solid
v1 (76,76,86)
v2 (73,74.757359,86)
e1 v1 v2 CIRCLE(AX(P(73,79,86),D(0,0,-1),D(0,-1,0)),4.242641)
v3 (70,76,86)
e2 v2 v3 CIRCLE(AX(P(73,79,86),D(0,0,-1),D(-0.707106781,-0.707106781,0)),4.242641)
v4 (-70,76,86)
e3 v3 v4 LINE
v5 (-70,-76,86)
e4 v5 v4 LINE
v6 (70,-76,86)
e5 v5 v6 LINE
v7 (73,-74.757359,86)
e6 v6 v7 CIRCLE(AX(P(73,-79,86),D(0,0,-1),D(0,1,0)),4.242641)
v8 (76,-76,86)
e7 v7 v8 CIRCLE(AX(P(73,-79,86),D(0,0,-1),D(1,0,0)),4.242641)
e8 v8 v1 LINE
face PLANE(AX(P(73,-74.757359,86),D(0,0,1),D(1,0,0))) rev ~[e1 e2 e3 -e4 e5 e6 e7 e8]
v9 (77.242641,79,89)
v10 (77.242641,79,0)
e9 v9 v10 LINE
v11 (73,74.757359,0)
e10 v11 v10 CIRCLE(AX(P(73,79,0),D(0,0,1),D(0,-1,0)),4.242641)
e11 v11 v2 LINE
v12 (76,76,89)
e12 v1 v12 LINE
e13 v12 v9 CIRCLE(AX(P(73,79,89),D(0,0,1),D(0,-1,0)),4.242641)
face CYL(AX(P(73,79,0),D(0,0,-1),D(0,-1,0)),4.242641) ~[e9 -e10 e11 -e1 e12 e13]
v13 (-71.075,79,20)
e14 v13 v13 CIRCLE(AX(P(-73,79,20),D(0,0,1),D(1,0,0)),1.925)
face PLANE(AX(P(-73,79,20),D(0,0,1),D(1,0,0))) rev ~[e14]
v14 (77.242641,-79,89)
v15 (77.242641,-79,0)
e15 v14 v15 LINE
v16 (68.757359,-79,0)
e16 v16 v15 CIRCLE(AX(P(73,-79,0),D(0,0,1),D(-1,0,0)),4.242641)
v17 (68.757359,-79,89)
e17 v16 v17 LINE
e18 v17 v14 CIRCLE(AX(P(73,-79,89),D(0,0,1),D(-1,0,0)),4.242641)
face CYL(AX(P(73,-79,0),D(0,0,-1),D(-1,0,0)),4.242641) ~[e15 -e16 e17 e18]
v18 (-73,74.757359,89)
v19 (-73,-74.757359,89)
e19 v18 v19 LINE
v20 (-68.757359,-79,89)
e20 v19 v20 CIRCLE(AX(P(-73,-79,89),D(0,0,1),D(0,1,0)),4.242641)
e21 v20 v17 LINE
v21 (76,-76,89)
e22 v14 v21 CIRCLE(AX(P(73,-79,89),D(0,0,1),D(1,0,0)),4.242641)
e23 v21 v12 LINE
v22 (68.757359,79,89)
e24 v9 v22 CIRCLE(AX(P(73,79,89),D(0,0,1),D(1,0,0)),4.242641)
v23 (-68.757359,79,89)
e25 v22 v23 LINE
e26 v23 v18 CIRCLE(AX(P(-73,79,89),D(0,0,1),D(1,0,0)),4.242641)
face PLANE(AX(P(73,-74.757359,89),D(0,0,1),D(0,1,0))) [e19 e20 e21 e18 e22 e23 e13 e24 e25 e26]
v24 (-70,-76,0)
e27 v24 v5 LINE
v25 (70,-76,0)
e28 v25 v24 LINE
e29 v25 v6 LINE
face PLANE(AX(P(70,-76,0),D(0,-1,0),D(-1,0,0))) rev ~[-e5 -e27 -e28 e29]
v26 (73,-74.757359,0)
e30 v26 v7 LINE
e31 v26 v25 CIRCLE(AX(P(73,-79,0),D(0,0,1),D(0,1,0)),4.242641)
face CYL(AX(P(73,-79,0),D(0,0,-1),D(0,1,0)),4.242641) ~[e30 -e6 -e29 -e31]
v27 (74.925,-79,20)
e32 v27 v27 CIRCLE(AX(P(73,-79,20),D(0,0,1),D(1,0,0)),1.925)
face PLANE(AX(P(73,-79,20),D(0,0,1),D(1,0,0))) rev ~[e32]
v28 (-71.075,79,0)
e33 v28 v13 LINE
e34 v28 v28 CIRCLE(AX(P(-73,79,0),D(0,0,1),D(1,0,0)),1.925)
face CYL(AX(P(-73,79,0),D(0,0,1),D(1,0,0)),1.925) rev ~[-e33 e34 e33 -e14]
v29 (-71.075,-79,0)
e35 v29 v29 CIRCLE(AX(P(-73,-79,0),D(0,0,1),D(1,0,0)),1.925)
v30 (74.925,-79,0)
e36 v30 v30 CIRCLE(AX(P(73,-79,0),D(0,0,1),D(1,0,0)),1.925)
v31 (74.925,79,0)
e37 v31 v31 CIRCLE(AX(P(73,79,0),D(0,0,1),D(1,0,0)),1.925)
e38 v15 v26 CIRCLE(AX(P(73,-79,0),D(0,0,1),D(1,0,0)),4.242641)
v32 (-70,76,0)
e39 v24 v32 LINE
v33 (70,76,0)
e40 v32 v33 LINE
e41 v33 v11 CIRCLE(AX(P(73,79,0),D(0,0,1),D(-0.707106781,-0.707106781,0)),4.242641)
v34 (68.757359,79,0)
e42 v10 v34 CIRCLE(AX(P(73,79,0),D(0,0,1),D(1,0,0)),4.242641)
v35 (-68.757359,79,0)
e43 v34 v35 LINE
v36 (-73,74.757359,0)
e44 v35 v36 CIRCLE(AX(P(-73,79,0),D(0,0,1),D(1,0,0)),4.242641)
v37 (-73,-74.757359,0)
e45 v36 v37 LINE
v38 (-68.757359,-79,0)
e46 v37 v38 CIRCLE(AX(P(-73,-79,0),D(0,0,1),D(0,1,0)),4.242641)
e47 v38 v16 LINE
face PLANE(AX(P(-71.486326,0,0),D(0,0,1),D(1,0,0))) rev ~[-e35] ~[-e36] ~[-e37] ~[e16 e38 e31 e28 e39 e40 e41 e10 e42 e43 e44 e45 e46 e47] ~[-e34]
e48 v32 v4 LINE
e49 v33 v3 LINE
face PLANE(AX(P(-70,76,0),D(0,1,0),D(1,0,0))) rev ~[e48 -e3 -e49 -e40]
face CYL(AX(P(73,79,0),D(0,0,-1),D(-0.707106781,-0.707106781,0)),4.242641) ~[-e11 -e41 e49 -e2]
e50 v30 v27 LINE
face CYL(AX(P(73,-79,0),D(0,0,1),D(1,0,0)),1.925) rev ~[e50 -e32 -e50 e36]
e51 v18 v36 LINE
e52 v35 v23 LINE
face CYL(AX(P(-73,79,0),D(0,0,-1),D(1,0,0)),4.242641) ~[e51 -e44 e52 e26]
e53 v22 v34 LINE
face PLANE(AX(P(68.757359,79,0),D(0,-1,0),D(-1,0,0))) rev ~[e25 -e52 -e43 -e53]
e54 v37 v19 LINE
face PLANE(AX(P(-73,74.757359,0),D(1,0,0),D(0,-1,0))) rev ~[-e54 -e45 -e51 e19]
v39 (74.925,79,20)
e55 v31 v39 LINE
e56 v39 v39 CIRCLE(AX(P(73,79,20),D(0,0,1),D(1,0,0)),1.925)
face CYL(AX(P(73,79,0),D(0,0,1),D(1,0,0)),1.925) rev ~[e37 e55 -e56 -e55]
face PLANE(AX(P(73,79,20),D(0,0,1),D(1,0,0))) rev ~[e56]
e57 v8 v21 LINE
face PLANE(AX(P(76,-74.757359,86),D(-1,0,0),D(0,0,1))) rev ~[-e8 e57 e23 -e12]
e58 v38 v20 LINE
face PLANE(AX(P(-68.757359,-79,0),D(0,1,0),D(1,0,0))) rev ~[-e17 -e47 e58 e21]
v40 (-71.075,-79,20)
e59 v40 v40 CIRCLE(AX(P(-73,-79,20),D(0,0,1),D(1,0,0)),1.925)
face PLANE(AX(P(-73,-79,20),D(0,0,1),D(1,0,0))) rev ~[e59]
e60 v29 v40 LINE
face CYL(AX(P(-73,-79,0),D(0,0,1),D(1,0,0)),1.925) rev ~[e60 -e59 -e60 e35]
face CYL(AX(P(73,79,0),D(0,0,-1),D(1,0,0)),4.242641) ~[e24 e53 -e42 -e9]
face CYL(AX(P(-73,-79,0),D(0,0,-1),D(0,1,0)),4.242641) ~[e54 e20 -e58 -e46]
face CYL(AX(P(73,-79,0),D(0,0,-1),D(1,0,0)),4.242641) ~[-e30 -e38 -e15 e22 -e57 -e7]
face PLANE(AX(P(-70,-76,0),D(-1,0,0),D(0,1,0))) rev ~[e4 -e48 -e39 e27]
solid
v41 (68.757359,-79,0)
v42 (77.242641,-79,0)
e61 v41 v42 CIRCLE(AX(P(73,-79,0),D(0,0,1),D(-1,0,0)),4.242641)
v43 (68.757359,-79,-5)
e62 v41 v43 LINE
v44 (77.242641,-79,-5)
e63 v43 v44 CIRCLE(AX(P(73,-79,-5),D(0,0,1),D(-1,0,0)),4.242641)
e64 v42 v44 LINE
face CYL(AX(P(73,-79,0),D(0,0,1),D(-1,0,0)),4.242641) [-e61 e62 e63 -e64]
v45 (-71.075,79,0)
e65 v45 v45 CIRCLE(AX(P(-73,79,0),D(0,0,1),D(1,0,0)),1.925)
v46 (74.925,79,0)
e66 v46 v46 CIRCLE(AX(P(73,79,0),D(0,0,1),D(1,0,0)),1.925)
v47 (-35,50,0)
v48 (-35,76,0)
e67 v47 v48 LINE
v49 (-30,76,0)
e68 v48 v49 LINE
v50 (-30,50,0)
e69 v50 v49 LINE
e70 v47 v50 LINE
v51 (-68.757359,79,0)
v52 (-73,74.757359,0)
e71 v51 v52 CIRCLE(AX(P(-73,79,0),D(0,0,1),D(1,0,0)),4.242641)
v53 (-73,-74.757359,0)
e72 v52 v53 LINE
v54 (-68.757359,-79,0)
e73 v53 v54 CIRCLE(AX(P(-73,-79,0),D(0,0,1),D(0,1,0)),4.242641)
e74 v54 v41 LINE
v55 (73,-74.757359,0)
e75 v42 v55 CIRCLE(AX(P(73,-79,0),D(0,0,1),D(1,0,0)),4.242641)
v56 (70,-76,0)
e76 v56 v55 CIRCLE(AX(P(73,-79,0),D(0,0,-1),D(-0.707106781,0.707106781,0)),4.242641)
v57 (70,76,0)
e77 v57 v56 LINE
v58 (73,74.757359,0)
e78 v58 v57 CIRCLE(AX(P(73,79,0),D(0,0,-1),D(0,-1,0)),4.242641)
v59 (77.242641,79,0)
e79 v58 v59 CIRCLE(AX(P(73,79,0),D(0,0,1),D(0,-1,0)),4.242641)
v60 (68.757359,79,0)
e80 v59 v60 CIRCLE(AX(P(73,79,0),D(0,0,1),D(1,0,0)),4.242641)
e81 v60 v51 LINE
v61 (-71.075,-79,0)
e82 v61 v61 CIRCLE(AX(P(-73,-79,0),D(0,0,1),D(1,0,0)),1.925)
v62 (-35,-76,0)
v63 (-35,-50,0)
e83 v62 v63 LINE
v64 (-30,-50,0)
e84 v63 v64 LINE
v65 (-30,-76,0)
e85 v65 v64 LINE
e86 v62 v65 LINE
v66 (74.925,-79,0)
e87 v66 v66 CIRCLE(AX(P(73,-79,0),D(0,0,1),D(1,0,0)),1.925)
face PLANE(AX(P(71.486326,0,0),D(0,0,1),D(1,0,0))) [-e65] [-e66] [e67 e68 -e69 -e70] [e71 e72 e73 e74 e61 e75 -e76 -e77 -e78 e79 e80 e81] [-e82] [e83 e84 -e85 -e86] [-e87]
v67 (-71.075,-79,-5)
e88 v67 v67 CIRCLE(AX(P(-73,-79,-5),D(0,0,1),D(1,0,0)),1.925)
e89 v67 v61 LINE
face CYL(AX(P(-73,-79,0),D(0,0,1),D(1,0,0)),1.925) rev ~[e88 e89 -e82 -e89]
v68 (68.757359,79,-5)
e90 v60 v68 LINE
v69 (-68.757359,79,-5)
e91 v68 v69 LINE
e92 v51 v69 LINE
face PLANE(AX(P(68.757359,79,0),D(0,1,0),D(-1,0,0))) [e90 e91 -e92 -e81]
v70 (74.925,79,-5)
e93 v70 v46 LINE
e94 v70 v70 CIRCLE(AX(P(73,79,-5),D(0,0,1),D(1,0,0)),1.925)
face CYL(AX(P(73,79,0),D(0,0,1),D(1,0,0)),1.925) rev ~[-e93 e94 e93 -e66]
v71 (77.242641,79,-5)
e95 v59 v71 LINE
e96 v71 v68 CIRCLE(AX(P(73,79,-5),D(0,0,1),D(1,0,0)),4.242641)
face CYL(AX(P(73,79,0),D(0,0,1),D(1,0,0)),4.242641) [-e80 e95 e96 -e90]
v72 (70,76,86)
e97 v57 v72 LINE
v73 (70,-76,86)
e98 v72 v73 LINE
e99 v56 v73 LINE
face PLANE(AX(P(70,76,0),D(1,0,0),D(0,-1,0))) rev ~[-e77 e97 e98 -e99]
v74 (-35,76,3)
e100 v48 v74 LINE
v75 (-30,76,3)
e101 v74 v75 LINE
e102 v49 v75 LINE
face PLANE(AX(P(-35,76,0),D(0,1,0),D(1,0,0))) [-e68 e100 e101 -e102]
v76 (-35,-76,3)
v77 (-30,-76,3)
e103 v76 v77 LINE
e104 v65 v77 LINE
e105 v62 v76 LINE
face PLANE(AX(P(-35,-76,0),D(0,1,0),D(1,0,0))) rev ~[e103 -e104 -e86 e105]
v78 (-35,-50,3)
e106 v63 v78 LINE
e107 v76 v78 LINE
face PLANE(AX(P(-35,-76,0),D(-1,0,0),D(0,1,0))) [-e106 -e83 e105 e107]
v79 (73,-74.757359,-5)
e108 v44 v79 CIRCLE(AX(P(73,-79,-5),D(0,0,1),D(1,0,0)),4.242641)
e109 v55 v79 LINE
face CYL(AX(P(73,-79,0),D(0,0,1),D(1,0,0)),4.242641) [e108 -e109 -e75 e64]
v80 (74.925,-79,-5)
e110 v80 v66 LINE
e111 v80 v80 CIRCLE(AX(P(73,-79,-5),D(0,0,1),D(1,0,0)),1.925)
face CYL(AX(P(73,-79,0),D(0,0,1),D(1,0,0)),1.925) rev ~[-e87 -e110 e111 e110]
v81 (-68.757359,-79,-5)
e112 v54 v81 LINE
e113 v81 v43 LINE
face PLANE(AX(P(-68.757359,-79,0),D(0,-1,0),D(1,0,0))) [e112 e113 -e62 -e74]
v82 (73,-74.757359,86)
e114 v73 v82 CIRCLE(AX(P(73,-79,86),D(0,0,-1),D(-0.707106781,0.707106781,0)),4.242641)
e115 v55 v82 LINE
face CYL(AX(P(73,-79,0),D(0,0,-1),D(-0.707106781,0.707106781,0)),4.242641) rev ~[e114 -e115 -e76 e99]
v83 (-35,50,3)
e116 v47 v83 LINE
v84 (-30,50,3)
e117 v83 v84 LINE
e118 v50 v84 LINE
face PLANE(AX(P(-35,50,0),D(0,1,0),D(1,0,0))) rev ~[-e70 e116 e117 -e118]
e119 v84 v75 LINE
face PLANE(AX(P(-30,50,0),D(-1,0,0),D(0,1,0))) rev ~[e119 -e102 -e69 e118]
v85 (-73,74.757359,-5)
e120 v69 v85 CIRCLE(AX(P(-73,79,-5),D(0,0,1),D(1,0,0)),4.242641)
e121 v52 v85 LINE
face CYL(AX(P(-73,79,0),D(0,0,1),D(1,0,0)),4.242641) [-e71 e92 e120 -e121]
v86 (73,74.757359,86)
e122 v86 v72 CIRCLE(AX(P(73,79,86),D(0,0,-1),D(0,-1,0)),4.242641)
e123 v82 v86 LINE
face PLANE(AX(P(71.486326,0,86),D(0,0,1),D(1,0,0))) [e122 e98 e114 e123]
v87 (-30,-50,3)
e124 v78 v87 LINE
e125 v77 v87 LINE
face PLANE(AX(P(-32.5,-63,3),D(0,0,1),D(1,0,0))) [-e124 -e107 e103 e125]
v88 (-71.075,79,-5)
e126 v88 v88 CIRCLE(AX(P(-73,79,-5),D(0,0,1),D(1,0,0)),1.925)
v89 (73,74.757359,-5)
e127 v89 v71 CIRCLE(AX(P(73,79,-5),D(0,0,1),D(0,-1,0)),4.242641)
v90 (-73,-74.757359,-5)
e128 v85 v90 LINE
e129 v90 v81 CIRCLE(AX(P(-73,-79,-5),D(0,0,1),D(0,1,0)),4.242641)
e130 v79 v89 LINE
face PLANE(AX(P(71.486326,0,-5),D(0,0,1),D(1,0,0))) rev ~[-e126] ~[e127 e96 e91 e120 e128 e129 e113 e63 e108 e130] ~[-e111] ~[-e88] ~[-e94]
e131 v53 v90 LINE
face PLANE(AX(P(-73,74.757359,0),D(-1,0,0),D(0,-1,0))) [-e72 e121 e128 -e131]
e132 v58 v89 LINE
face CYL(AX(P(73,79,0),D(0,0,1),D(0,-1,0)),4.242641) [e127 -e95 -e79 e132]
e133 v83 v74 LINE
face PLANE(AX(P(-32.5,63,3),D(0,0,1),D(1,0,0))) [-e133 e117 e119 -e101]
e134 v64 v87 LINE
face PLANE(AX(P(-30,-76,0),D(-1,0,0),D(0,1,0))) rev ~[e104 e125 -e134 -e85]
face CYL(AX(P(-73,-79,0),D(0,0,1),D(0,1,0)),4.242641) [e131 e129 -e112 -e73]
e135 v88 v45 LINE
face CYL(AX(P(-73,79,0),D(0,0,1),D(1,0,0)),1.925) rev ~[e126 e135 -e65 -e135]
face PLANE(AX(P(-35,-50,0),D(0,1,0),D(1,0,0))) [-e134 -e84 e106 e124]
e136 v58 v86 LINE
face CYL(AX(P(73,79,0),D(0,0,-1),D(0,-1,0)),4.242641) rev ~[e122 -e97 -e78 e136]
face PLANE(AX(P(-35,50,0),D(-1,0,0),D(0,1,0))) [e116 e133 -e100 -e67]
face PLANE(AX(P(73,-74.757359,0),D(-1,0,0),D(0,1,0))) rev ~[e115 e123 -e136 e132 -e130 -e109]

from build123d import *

# Parameters (mm, degrees)
F0_W          = 5
F0_H          = 26
F1_DEPTH      = 5
F2_DEPTH      = 86
F3_DEPTH      = 3
F4_DEPTH      = 89
F5_START      = 86
F5_DEPTH      = 3
F6_R          = 1.925
F7_DEPTH      = 20
F7_DEPTH_BACK = 5
F8_DEPTH      = 3
F9_DEPTH      = 1.2426406871
F10_DEPTH     = 1.2426406871


# Not quite as in the source:
# - a feature names something its author has since deleted; it is built from what else it names


with BuildPart() as f1:
    # F0 (on Top) → F1 (new body)
    with BuildSketch(Plane.XY):
        with BuildLine():
            ThreePointArc((73, 74.7573593129), (71.3764116996, 75.0803111054), (70, 76))
            Line((70, 76), (70, -76))
            ThreePointArc((70, -76), (71.3764116996, -75.0803111054), (73, -74.7573593129))
            Line((73, -74.7573593129), (73, 74.7573593129))
        make_face()
        Polygon((70, -76), (70, 76), (-30, 76), (-30, 50), (-30, -50), (-30, -76), align=None)
        Polygon((-35, 50), (-35, 76), (-70, 76), (-70, -76), (-35, -76), (-35, -50), (-30, -50), (-30, 50), align=None)
        with Locations((-32.5, -63)):
            Rectangle(F0_W, F0_H)
        with Locations((-32.5, 63)):
            Rectangle(F0_W, F0_H)
        with BuildLine():
            Line((-70, -76), (-70, 76))
            ThreePointArc((-70, 76), (-71.3764116996, 75.0803111054), (-73, 74.7573593129))
            Line((-73, 74.7573593129), (-73, -74.7573593129))
            ThreePointArc((-73, -74.7573593129), (-71.3764116996, -75.0803111054), (-70, -76))
        make_face()
        with BuildLine():
            ThreePointArc((73, -74.7573593129), (71.3764116996, -75.0803111054), (70, -76))
            Line((70, -76), (73, -76))
            Line((73, -76), (73, -74.7573593129))
        make_face()
        with BuildLine():
            Line((73, -76), (70, -76))
            ThreePointArc((70, -76), (69.0803111054, -77.3764116996), (68.7573593129, -79))
            Line((68.7573593129, -79), (73, -79))
            Line((73, -79), (73, -76))
        make_face()
        with BuildLine():
            Line((73, -74.7573593129), (73, -76))
            Line((73, -76), (73, -79))
            Line((73, -79), (68.7573593129, -79))
            ThreePointArc((68.7573593129, -79), (73, -83.2426406871), (77.2426406871, -79))
            ThreePointArc((77.2426406871, -79), (76, -76), (73, -74.7573593129))
        make_face()
        with BuildLine():
            Line((73, 76), (70, 76))
            ThreePointArc((70, 76), (71.3764116996, 75.0803111054), (73, 74.7573593129))
            Line((73, 74.7573593129), (73, 76))
        make_face()
        with BuildLine():
            ThreePointArc((68.7573593129, 79), (69.0803111054, 77.3764116996), (70, 76))
            Line((70, 76), (73, 76))
            Line((73, 76), (73, 79))
            Line((73, 79), (68.7573593129, 79))
        make_face()
        with BuildLine():
            Line((73, 79), (73, 76))
            Line((73, 76), (73, 74.7573593129))
            ThreePointArc((73, 74.7573593129), (76, 76), (77.2426406871, 79))
            ThreePointArc((77.2426406871, 79), (73, 83.2426406871), (68.7573593129, 79))
            Line((68.7573593129, 79), (73, 79))
        make_face()
        with BuildLine():
            Line((-30, 76), (70, 76))
            ThreePointArc((70, 76), (69.0803111054, 77.3764116996), (68.7573593129, 79))
            Line((68.7573593129, 79), (-68.7573593129, 79))
            ThreePointArc((-68.7573593129, 79), (-69.0803111054, 77.3764116996), (-70, 76))
            Line((-70, 76), (-35, 76))
            Line((-35, 76), (-30, 76))
        make_face()
        with BuildLine():
            ThreePointArc((-70, 76), (-69.0803111054, 77.3764116996), (-68.7573593129, 79))
            Line((-68.7573593129, 79), (-73, 79))
            Line((-73, 79), (-73, 74.7573593129))
            ThreePointArc((-73, 74.7573593129), (-71.3764116996, 75.0803111054), (-70, 76))
        make_face()
        with BuildLine():
            Line((-73, 79), (-68.7573593129, 79))
            ThreePointArc((-68.7573593129, 79), (-76, 82), (-73, 74.7573593129))
            Line((-73, 74.7573593129), (-73, 79))
        make_face()
        with BuildLine():
            Line((-73, -79), (-68.7573593129, -79))
            ThreePointArc((-68.7573593129, -79), (-69.0803111054, -77.3764116996), (-70, -76))
            ThreePointArc((-70, -76), (-71.3764116996, -75.0803111054), (-73, -74.7573593129))
            Line((-73, -74.7573593129), (-73, -79))
        make_face()
        with BuildLine():
            ThreePointArc((-73, -74.7573593129), (-76, -82), (-68.7573593129, -79))
            Line((-68.7573593129, -79), (-73, -79))
            Line((-73, -79), (-73, -74.7573593129))
        make_face()
        with BuildLine():
            ThreePointArc((68.7573593129, -79), (69.0803111054, -77.3764116996), (70, -76))
            Line((70, -76), (-30, -76))
            Line((-30, -76), (-35, -76))
            Line((-35, -76), (-70, -76))
            ThreePointArc((-70, -76), (-69.0803111054, -77.3764116996), (-68.7573593129, -79))
            Line((-68.7573593129, -79), (68.7573593129, -79))
        make_face()
    extrude(amount=-F1_DEPTH)

    # F0 (on Top) → F2 (join)
    with BuildSketch(Plane.XY):
        with BuildLine():
            ThreePointArc((73, 74.7573593129), (71.3764116996, 75.0803111054), (70, 76))
            Line((70, 76), (70, -76))
            ThreePointArc((70, -76), (71.3764116996, -75.0803111054), (73, -74.7573593129))
            Line((73, -74.7573593129), (73, 74.7573593129))
        make_face()
    extrude(amount=F2_DEPTH)

    # F0 (on Top) → F3 (join)
    with BuildSketch(Plane.XY):
        with Locations((-32.5, 63)):
            Rectangle(F0_W, F0_H)
        with Locations((-32.5, -63)):
            Rectangle(F0_W, F0_H)
    extrude(amount=F3_DEPTH)


with BuildPart() as f4:
    # F0 (on Top) → F4 (new body)
    with BuildSketch(Plane.XY):
        with BuildLine():
            Line((-70, -76), (-70, 76))
            ThreePointArc((-70, 76), (-71.3764116996, 75.0803111054), (-73, 74.7573593129))
            Line((-73, 74.7573593129), (-73, -74.7573593129))
            ThreePointArc((-73, -74.7573593129), (-71.3764116996, -75.0803111054), (-70, -76))
        make_face()
        with BuildLine():
            Line((73, -76), (70, -76))
            ThreePointArc((70, -76), (69.0803111054, -77.3764116996), (68.7573593129, -79))
            Line((68.7573593129, -79), (73, -79))
            Line((73, -79), (73, -76))
        make_face()
        with BuildLine():
            ThreePointArc((68.7573593129, 79), (69.0803111054, 77.3764116996), (70, 76))
            Line((70, 76), (73, 76))
            Line((73, 76), (73, 79))
            Line((73, 79), (68.7573593129, 79))
        make_face()
        with BuildLine():
            Line((73, 79), (73, 76))
            Line((73, 76), (73, 74.7573593129))
            ThreePointArc((73, 74.7573593129), (76, 76), (77.2426406871, 79))
            ThreePointArc((77.2426406871, 79), (73, 83.2426406871), (68.7573593129, 79))
            Line((68.7573593129, 79), (73, 79))
        make_face()
        with BuildLine():
            Line((73, -74.7573593129), (73, -76))
            Line((73, -76), (73, -79))
            Line((73, -79), (68.7573593129, -79))
            ThreePointArc((68.7573593129, -79), (73, -83.2426406871), (77.2426406871, -79))
            ThreePointArc((77.2426406871, -79), (76, -76), (73, -74.7573593129))
        make_face()
        with BuildLine():
            ThreePointArc((73, -74.7573593129), (71.3764116996, -75.0803111054), (70, -76))
            Line((70, -76), (73, -76))
            Line((73, -76), (73, -74.7573593129))
        make_face()
        with BuildLine():
            Line((73, 76), (70, 76))
            ThreePointArc((70, 76), (71.3764116996, 75.0803111054), (73, 74.7573593129))
            Line((73, 74.7573593129), (73, 76))
        make_face()
        with BuildLine():
            Line((-73, -79), (-68.7573593129, -79))
            ThreePointArc((-68.7573593129, -79), (-69.0803111054, -77.3764116996), (-70, -76))
            ThreePointArc((-70, -76), (-71.3764116996, -75.0803111054), (-73, -74.7573593129))
            Line((-73, -74.7573593129), (-73, -79))
        make_face()
        with BuildLine():
            ThreePointArc((68.7573593129, -79), (69.0803111054, -77.3764116996), (70, -76))
            Line((70, -76), (-30, -76))
            Line((-30, -76), (-35, -76))
            Line((-35, -76), (-70, -76))
            ThreePointArc((-70, -76), (-69.0803111054, -77.3764116996), (-68.7573593129, -79))
            Line((-68.7573593129, -79), (68.7573593129, -79))
        make_face()
        with BuildLine():
            ThreePointArc((-73, -74.7573593129), (-76, -82), (-68.7573593129, -79))
            Line((-68.7573593129, -79), (-73, -79))
            Line((-73, -79), (-73, -74.7573593129))
        make_face()
        with BuildLine():
            Line((-30, 76), (70, 76))
            ThreePointArc((70, 76), (69.0803111054, 77.3764116996), (68.7573593129, 79))
            Line((68.7573593129, 79), (-68.7573593129, 79))
            ThreePointArc((-68.7573593129, 79), (-69.0803111054, 77.3764116996), (-70, 76))
            Line((-70, 76), (-35, 76))
            Line((-35, 76), (-30, 76))
        make_face()
        with BuildLine():
            Line((-73, 79), (-68.7573593129, 79))
            ThreePointArc((-68.7573593129, 79), (-76, 82), (-73, 74.7573593129))
            Line((-73, 74.7573593129), (-73, 79))
        make_face()
        with BuildLine():
            ThreePointArc((-70, 76), (-69.0803111054, 77.3764116996), (-68.7573593129, 79))
            Line((-68.7573593129, 79), (-73, 79))
            Line((-73, 79), (-73, 74.7573593129))
            ThreePointArc((-73, 74.7573593129), (-71.3764116996, 75.0803111054), (-70, 76))
        make_face()
    extrude(amount=F4_DEPTH)

    # F0 (on Top) → F5 (join)
    with BuildSketch(Plane.XY.offset(F5_START)):
        Polygon((70, -76), (70, 76), (-30, 76), (-30, 50), (-30, -50), (-30, -76), align=None)
        Polygon((-35, 50), (-35, 76), (-70, 76), (-70, -76), (-35, -76), (-35, -50), (-30, -50), (-30, 50), align=None)
        with Locations((-32.5, 63)):
            Rectangle(F0_W, F0_H)
        with Locations((-32.5, -63)):
            Rectangle(F0_W, F0_H)
        with BuildLine():
            ThreePointArc((73, 74.7573593129), (71.3764116996, 75.0803111054), (70, 76))
            Line((70, 76), (70, -76))
            ThreePointArc((70, -76), (71.3764116996, -75.0803111054), (73, -74.7573593129))
            Line((73, -74.7573593129), (73, 74.7573593129))
        make_face()
        with BuildLine():
            ThreePointArc((73, -74.7573593129), (71.3764116996, -75.0803111054), (70, -76))
            Line((70, -76), (73, -76))
            Line((73, -76), (73, -74.7573593129))
        make_face()
        with BuildLine():
            Line((73, 76), (70, 76))
            ThreePointArc((70, 76), (71.3764116996, 75.0803111054), (73, 74.7573593129))
            Line((73, 74.7573593129), (73, 76))
        make_face()
        with BuildLine():
            ThreePointArc((68.7573593129, 79), (69.0803111054, 77.3764116996), (70, 76))
            Line((70, 76), (73, 76))
            Line((73, 76), (73, 79))
            Line((73, 79), (68.7573593129, 79))
        make_face()
        with BuildLine():
            Line((-70, -76), (-70, 76))
            ThreePointArc((-70, 76), (-71.3764116996, 75.0803111054), (-73, 74.7573593129))
            Line((-73, 74.7573593129), (-73, -74.7573593129))
            ThreePointArc((-73, -74.7573593129), (-71.3764116996, -75.0803111054), (-70, -76))
        make_face()
        with BuildLine():
            Line((73, 79), (73, 76))
            Line((73, 76), (73, 74.7573593129))
            ThreePointArc((73, 74.7573593129), (76, 76), (77.2426406871, 79))
            ThreePointArc((77.2426406871, 79), (73, 83.2426406871), (68.7573593129, 79))
            Line((68.7573593129, 79), (73, 79))
        make_face()
        with BuildLine():
            Line((73, -76), (70, -76))
            ThreePointArc((70, -76), (69.0803111054, -77.3764116996), (68.7573593129, -79))
            Line((68.7573593129, -79), (73, -79))
            Line((73, -79), (73, -76))
        make_face()
        with BuildLine():
            Line((73, -74.7573593129), (73, -76))
            Line((73, -76), (73, -79))
            Line((73, -79), (68.7573593129, -79))
            ThreePointArc((68.7573593129, -79), (73, -83.2426406871), (77.2426406871, -79))
            ThreePointArc((77.2426406871, -79), (76, -76), (73, -74.7573593129))
        make_face()
    extrude(amount=F5_DEPTH)


with BuildPart() as f7_tool:
    # F6 (on Top) → F7 (new body, two sides)
    with BuildSketch(Plane.XY) as f7_sk:
        with Locations((73, -79)):
            Circle(F6_R)
        with Locations((73, 79)):
            Circle(F6_R)
        with Locations((-73, -79)):
            Circle(F6_R)
        with Locations((-73, 79)):
            Circle(F6_R)
    extrude(amount=F7_DEPTH)
    extrude(f7_sk.sketch, amount=-F7_DEPTH_BACK)


with BuildPart() as f1_1:
    add(f1.part)

    # F7: cut by f7_tool
    add(f7_tool.part, mode=Mode.SUBTRACT)


with BuildPart() as f4_1:
    add(f4.part)

    # F7: cut by f7_tool
    add(f7_tool.part, mode=Mode.SUBTRACT)

    # F8 (add): a face of the model
    f8_faces = [f4_1.faces().sort_by_distance(p)[0] for p in [
        (73, 0, 87.5),
    ]]
    extrude(f8_faces, amount=F8_DEPTH)

    # F9 (add, through all): a face of the model
    f9_faces = [f4_1.faces().sort_by_distance(p)[0] for p in [
        (74.5, -74.7573593129, 87.5),
    ]]
    extrude(f9_faces, amount=F9_DEPTH)

    # F10 (add, through all): a face of the model
    f10_faces = [f4_1.faces().sort_by_distance(p)[0] for p in [
        (74.5, 74.7573593129, 87.5),
    ]]
    extrude(f10_faces, amount=F10_DEPTH)


solid = Compound([f1_1.part, f4_1.part])
